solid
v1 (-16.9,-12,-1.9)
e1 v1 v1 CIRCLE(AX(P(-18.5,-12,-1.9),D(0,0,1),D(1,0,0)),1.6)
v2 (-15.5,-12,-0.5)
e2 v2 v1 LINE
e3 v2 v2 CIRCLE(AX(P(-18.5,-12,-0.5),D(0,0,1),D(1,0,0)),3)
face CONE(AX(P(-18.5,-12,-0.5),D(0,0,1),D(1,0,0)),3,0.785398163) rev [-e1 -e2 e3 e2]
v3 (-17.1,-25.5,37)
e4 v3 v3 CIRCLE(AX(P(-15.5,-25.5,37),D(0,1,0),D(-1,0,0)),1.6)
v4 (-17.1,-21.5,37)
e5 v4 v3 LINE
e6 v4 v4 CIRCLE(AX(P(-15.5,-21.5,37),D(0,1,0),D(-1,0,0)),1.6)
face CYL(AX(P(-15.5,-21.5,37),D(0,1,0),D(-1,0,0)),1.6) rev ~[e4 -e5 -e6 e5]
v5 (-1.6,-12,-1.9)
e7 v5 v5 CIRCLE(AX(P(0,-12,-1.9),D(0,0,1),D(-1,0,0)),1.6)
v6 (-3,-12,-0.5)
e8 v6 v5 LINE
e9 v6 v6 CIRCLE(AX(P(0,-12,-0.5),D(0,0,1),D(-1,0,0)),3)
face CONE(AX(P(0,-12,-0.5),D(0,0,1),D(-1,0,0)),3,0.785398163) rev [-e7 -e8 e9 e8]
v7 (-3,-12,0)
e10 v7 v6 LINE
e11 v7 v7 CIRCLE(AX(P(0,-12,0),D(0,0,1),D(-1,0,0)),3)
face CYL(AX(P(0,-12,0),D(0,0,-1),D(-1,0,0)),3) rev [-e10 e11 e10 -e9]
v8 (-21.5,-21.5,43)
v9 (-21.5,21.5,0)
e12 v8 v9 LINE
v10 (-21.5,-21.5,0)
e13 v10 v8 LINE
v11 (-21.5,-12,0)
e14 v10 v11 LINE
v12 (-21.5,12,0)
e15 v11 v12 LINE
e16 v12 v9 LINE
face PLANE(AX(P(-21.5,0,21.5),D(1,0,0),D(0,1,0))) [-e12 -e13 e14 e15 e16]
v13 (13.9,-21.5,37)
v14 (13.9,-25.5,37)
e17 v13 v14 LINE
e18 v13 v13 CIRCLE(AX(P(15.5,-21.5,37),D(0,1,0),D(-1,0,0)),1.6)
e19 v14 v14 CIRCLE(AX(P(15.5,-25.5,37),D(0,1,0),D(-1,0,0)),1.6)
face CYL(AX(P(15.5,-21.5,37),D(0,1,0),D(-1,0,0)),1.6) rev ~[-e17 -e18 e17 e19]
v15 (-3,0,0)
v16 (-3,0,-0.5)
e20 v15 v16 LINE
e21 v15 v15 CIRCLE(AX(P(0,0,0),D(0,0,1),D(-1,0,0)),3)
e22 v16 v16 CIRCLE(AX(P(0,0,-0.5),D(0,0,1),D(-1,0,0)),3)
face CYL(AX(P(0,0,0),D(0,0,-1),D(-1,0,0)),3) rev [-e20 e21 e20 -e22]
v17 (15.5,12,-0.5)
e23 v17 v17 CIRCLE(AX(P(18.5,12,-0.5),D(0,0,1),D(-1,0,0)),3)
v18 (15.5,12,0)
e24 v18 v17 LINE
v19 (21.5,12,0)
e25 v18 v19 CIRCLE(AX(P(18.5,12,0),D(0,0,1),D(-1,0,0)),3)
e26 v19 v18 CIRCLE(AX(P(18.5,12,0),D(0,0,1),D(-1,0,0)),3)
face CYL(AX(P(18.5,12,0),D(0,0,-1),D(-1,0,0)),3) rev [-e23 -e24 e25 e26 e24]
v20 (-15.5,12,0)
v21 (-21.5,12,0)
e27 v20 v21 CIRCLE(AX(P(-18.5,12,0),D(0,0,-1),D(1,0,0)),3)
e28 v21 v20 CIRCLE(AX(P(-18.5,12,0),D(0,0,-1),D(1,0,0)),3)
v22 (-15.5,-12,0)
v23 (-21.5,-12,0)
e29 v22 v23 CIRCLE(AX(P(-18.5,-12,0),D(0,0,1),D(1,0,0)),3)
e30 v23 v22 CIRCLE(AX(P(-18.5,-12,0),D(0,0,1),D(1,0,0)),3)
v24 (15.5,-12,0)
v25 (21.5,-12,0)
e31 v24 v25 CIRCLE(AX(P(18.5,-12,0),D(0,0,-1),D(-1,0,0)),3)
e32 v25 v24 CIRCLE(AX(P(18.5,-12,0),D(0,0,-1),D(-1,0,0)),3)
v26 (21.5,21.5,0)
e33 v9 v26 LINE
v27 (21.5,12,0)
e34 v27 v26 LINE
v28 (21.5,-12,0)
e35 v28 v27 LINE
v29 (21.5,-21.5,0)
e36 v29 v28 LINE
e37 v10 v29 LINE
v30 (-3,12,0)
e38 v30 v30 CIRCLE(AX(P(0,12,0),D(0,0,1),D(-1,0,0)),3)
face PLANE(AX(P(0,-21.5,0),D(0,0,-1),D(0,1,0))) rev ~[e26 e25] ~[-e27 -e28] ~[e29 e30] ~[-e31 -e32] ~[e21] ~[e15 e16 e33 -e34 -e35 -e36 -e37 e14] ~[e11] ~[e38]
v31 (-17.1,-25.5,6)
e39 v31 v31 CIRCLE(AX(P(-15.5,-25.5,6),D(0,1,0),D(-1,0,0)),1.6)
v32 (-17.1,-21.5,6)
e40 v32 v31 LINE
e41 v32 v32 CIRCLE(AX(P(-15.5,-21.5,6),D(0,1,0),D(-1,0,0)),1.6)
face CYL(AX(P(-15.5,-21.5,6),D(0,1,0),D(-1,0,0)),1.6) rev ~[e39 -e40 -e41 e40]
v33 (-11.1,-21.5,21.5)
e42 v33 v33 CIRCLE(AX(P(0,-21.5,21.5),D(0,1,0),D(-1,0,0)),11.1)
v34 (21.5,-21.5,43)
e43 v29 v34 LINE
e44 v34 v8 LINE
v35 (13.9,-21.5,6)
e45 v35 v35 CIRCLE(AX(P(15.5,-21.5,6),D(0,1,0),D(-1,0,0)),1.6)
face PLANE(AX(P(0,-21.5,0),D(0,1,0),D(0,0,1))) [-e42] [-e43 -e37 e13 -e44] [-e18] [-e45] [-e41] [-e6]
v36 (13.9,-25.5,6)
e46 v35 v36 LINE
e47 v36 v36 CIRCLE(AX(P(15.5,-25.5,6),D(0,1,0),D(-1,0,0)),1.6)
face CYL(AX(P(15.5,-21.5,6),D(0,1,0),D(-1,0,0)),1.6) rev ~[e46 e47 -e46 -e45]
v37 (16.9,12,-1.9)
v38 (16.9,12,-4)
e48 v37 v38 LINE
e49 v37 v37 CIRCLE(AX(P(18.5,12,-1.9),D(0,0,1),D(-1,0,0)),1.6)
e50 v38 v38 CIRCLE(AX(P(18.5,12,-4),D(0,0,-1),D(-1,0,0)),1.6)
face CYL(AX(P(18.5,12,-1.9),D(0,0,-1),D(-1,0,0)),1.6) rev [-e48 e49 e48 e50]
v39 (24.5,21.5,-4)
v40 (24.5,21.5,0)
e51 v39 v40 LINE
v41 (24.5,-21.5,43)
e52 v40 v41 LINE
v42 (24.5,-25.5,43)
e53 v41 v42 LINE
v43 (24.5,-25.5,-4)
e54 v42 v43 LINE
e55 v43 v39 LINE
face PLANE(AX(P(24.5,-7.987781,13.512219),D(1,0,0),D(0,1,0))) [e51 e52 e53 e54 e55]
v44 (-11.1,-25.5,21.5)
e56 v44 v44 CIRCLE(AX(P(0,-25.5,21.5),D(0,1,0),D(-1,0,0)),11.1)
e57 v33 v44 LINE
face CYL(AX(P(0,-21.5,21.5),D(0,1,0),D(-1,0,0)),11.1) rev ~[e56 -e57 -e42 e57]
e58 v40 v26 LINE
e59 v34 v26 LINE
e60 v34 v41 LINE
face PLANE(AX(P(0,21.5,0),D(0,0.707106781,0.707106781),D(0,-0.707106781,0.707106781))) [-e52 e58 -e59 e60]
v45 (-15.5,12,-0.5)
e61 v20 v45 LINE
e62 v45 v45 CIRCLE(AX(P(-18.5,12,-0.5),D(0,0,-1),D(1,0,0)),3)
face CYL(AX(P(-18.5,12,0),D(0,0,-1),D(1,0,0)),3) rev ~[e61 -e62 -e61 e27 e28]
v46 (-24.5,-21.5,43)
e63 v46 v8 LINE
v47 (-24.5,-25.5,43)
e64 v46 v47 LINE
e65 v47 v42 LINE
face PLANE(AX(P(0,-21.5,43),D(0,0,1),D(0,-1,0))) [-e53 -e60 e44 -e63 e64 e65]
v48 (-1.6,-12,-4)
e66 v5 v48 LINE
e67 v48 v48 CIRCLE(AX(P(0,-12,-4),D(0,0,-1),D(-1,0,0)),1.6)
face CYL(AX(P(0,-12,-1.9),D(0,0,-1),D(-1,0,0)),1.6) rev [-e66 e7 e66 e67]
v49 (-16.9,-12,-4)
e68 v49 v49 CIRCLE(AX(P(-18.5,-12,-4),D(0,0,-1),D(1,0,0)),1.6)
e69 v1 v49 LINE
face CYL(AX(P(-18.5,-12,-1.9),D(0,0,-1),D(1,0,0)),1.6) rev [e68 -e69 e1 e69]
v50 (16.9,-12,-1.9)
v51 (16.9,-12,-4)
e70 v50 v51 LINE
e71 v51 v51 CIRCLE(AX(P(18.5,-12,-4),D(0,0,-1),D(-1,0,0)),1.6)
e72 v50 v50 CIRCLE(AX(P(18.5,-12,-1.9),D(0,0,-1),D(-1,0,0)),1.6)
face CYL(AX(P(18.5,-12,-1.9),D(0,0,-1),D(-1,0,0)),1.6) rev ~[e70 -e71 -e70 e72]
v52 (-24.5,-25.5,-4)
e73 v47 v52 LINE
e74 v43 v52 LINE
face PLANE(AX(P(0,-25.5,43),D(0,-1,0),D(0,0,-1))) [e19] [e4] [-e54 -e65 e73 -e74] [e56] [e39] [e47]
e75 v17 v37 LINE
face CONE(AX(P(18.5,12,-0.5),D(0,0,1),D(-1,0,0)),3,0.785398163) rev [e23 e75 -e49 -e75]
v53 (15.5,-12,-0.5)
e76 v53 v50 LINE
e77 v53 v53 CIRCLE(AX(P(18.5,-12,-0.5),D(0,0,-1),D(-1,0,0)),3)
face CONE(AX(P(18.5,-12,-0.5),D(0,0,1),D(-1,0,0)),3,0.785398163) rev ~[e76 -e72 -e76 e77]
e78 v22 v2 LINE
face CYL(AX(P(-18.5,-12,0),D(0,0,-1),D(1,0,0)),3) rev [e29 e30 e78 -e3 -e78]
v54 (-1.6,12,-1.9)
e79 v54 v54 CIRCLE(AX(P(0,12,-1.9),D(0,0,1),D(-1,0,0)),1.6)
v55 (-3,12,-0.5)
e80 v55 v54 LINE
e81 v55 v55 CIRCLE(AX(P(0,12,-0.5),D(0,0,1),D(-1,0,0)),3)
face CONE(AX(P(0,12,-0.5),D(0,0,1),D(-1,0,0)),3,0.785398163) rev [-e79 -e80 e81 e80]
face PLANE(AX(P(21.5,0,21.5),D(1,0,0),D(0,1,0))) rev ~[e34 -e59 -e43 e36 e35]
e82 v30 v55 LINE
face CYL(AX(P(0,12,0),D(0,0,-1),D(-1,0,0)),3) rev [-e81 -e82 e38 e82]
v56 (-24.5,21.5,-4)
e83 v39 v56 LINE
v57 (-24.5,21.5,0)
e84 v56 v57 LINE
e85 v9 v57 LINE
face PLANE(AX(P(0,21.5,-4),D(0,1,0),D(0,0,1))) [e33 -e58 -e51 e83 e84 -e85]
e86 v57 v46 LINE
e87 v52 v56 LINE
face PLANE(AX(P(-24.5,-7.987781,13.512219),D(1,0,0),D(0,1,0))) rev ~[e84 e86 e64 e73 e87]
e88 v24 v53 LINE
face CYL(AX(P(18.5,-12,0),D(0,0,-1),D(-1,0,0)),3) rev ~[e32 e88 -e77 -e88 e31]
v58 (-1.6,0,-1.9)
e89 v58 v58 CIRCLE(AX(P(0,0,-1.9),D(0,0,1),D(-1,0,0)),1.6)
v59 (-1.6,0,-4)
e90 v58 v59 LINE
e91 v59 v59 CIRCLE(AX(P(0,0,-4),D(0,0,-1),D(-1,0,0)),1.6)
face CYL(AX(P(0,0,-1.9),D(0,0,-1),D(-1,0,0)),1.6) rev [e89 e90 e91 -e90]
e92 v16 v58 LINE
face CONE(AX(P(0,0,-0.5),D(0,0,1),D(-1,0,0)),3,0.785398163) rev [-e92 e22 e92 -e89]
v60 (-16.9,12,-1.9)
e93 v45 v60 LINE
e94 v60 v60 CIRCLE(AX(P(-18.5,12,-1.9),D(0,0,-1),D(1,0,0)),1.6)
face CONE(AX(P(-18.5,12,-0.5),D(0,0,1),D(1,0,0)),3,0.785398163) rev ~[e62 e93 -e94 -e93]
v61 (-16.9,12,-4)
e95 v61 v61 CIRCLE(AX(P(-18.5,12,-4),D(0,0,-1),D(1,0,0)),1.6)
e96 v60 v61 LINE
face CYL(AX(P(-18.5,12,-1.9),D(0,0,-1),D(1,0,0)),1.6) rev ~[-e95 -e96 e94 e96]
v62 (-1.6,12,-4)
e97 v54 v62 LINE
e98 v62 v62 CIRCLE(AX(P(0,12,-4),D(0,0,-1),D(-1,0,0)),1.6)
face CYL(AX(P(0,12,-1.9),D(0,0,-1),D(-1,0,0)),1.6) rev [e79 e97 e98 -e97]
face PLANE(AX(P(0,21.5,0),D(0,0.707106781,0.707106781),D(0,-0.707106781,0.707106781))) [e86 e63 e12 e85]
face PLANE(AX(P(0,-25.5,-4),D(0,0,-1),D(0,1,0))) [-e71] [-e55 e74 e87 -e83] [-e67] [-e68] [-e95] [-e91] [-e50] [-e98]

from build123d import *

# Parameters (mm, degrees)
F2_DEPTH = 24.5
F0_W     = 43
F0_H     = 43
F3_DEPTH = 21.5
F5_R     = 11.1
F5_R_2   = 1.6
F6_DEPTH = 4


# Not quite as in the source:
# - a feature of the source that left no trace in its solid (it failed there, or was rolled back) is left out


with BuildPart() as f2:
    # F1 (on Right) → F2 (new body, symmetric)
    with BuildSketch(Plane.YZ):
        Polygon((21.5, 0), (-21.5, 43), (-25.5, 43), (-25.5, -4), (21.5, -4), align=None)
    extrude(amount=F2_DEPTH, both=True)

    # F0 (on Right) → F3 (cut, symmetric)
    with BuildSketch(Plane.YZ):
        with Locations((0, 21.5)):
            Rectangle(F0_W, F0_H)
    extrude(amount=F3_DEPTH, both=True, mode=Mode.SUBTRACT)

    # F5 (on face) → F6 (cut, through all)
    with BuildSketch(Plane(origin=(0, -21.5, 0), x_dir=(-1, 0, 0), z_dir=(0, 1, 0))):
        with Locations((0, 21.5)):
            Circle(F5_R)
        with Locations((15.5, 37)):
            Circle(F5_R_2)
        with Locations((-15.5, 37)):
            Circle(F5_R_2)
        with Locations((-15.5, 6)):
            Circle(F5_R_2)
        with Locations((15.5, 6)):
            Circle(F5_R_2)
    extrude(amount=-F6_DEPTH, mode=Mode.SUBTRACT)


with BuildPart() as f7:
    # F13 (on Front) → F7 (revolve)
    with BuildSketch(Plane.XZ):
        Polygon((0, -7.6705187887), (0, 0), (-3, 0), (-3, -0.5), (-1.6, -1.9), (-1.6, -7.6705187887), align=None)
    revolve(axis=Axis((0, 0, -3.8352593944), (0, 0, 1)))


with BuildPart() as f14_1:
    # F14: copy of F7
    add(f7.part.moved(Location((0, 12, 0))))


with BuildPart() as f8_1:
    # F8: copy of F7
    add(f7.part.moved(Location((0, -12, 0))))


with BuildPart() as f9_1:
    # F9: copy of F14_1
    add(f14_1.part.moved(Location((18.5, 0, 0))))


with BuildPart() as f10_1:
    # F10: instance of F9_1
    add(f9_1.part.mirror(Plane.YZ))


with BuildPart() as f15_1:
    # F15: instance of F9_1
    add(f9_1.part.mirror(Plane.XZ))


with BuildPart() as f15_2:
    # F15: instance of F10_1
    add(f10_1.part.mirror(Plane.XZ))


with BuildPart() as f2_1:
    add(f2.part)

    # F11: cut F15_1, F8_1, F15_2, F9_1, F14_1, F10_1, F7
    add(f15_1.part, mode=Mode.SUBTRACT)
    add(f8_1.part, mode=Mode.SUBTRACT)
    add(f15_2.part, mode=Mode.SUBTRACT)
    add(f9_1.part, mode=Mode.SUBTRACT)
    add(f14_1.part, mode=Mode.SUBTRACT)
    add(f10_1.part, mode=Mode.SUBTRACT)
    add(f7.part, mode=Mode.SUBTRACT)


solid = f2_1.part
